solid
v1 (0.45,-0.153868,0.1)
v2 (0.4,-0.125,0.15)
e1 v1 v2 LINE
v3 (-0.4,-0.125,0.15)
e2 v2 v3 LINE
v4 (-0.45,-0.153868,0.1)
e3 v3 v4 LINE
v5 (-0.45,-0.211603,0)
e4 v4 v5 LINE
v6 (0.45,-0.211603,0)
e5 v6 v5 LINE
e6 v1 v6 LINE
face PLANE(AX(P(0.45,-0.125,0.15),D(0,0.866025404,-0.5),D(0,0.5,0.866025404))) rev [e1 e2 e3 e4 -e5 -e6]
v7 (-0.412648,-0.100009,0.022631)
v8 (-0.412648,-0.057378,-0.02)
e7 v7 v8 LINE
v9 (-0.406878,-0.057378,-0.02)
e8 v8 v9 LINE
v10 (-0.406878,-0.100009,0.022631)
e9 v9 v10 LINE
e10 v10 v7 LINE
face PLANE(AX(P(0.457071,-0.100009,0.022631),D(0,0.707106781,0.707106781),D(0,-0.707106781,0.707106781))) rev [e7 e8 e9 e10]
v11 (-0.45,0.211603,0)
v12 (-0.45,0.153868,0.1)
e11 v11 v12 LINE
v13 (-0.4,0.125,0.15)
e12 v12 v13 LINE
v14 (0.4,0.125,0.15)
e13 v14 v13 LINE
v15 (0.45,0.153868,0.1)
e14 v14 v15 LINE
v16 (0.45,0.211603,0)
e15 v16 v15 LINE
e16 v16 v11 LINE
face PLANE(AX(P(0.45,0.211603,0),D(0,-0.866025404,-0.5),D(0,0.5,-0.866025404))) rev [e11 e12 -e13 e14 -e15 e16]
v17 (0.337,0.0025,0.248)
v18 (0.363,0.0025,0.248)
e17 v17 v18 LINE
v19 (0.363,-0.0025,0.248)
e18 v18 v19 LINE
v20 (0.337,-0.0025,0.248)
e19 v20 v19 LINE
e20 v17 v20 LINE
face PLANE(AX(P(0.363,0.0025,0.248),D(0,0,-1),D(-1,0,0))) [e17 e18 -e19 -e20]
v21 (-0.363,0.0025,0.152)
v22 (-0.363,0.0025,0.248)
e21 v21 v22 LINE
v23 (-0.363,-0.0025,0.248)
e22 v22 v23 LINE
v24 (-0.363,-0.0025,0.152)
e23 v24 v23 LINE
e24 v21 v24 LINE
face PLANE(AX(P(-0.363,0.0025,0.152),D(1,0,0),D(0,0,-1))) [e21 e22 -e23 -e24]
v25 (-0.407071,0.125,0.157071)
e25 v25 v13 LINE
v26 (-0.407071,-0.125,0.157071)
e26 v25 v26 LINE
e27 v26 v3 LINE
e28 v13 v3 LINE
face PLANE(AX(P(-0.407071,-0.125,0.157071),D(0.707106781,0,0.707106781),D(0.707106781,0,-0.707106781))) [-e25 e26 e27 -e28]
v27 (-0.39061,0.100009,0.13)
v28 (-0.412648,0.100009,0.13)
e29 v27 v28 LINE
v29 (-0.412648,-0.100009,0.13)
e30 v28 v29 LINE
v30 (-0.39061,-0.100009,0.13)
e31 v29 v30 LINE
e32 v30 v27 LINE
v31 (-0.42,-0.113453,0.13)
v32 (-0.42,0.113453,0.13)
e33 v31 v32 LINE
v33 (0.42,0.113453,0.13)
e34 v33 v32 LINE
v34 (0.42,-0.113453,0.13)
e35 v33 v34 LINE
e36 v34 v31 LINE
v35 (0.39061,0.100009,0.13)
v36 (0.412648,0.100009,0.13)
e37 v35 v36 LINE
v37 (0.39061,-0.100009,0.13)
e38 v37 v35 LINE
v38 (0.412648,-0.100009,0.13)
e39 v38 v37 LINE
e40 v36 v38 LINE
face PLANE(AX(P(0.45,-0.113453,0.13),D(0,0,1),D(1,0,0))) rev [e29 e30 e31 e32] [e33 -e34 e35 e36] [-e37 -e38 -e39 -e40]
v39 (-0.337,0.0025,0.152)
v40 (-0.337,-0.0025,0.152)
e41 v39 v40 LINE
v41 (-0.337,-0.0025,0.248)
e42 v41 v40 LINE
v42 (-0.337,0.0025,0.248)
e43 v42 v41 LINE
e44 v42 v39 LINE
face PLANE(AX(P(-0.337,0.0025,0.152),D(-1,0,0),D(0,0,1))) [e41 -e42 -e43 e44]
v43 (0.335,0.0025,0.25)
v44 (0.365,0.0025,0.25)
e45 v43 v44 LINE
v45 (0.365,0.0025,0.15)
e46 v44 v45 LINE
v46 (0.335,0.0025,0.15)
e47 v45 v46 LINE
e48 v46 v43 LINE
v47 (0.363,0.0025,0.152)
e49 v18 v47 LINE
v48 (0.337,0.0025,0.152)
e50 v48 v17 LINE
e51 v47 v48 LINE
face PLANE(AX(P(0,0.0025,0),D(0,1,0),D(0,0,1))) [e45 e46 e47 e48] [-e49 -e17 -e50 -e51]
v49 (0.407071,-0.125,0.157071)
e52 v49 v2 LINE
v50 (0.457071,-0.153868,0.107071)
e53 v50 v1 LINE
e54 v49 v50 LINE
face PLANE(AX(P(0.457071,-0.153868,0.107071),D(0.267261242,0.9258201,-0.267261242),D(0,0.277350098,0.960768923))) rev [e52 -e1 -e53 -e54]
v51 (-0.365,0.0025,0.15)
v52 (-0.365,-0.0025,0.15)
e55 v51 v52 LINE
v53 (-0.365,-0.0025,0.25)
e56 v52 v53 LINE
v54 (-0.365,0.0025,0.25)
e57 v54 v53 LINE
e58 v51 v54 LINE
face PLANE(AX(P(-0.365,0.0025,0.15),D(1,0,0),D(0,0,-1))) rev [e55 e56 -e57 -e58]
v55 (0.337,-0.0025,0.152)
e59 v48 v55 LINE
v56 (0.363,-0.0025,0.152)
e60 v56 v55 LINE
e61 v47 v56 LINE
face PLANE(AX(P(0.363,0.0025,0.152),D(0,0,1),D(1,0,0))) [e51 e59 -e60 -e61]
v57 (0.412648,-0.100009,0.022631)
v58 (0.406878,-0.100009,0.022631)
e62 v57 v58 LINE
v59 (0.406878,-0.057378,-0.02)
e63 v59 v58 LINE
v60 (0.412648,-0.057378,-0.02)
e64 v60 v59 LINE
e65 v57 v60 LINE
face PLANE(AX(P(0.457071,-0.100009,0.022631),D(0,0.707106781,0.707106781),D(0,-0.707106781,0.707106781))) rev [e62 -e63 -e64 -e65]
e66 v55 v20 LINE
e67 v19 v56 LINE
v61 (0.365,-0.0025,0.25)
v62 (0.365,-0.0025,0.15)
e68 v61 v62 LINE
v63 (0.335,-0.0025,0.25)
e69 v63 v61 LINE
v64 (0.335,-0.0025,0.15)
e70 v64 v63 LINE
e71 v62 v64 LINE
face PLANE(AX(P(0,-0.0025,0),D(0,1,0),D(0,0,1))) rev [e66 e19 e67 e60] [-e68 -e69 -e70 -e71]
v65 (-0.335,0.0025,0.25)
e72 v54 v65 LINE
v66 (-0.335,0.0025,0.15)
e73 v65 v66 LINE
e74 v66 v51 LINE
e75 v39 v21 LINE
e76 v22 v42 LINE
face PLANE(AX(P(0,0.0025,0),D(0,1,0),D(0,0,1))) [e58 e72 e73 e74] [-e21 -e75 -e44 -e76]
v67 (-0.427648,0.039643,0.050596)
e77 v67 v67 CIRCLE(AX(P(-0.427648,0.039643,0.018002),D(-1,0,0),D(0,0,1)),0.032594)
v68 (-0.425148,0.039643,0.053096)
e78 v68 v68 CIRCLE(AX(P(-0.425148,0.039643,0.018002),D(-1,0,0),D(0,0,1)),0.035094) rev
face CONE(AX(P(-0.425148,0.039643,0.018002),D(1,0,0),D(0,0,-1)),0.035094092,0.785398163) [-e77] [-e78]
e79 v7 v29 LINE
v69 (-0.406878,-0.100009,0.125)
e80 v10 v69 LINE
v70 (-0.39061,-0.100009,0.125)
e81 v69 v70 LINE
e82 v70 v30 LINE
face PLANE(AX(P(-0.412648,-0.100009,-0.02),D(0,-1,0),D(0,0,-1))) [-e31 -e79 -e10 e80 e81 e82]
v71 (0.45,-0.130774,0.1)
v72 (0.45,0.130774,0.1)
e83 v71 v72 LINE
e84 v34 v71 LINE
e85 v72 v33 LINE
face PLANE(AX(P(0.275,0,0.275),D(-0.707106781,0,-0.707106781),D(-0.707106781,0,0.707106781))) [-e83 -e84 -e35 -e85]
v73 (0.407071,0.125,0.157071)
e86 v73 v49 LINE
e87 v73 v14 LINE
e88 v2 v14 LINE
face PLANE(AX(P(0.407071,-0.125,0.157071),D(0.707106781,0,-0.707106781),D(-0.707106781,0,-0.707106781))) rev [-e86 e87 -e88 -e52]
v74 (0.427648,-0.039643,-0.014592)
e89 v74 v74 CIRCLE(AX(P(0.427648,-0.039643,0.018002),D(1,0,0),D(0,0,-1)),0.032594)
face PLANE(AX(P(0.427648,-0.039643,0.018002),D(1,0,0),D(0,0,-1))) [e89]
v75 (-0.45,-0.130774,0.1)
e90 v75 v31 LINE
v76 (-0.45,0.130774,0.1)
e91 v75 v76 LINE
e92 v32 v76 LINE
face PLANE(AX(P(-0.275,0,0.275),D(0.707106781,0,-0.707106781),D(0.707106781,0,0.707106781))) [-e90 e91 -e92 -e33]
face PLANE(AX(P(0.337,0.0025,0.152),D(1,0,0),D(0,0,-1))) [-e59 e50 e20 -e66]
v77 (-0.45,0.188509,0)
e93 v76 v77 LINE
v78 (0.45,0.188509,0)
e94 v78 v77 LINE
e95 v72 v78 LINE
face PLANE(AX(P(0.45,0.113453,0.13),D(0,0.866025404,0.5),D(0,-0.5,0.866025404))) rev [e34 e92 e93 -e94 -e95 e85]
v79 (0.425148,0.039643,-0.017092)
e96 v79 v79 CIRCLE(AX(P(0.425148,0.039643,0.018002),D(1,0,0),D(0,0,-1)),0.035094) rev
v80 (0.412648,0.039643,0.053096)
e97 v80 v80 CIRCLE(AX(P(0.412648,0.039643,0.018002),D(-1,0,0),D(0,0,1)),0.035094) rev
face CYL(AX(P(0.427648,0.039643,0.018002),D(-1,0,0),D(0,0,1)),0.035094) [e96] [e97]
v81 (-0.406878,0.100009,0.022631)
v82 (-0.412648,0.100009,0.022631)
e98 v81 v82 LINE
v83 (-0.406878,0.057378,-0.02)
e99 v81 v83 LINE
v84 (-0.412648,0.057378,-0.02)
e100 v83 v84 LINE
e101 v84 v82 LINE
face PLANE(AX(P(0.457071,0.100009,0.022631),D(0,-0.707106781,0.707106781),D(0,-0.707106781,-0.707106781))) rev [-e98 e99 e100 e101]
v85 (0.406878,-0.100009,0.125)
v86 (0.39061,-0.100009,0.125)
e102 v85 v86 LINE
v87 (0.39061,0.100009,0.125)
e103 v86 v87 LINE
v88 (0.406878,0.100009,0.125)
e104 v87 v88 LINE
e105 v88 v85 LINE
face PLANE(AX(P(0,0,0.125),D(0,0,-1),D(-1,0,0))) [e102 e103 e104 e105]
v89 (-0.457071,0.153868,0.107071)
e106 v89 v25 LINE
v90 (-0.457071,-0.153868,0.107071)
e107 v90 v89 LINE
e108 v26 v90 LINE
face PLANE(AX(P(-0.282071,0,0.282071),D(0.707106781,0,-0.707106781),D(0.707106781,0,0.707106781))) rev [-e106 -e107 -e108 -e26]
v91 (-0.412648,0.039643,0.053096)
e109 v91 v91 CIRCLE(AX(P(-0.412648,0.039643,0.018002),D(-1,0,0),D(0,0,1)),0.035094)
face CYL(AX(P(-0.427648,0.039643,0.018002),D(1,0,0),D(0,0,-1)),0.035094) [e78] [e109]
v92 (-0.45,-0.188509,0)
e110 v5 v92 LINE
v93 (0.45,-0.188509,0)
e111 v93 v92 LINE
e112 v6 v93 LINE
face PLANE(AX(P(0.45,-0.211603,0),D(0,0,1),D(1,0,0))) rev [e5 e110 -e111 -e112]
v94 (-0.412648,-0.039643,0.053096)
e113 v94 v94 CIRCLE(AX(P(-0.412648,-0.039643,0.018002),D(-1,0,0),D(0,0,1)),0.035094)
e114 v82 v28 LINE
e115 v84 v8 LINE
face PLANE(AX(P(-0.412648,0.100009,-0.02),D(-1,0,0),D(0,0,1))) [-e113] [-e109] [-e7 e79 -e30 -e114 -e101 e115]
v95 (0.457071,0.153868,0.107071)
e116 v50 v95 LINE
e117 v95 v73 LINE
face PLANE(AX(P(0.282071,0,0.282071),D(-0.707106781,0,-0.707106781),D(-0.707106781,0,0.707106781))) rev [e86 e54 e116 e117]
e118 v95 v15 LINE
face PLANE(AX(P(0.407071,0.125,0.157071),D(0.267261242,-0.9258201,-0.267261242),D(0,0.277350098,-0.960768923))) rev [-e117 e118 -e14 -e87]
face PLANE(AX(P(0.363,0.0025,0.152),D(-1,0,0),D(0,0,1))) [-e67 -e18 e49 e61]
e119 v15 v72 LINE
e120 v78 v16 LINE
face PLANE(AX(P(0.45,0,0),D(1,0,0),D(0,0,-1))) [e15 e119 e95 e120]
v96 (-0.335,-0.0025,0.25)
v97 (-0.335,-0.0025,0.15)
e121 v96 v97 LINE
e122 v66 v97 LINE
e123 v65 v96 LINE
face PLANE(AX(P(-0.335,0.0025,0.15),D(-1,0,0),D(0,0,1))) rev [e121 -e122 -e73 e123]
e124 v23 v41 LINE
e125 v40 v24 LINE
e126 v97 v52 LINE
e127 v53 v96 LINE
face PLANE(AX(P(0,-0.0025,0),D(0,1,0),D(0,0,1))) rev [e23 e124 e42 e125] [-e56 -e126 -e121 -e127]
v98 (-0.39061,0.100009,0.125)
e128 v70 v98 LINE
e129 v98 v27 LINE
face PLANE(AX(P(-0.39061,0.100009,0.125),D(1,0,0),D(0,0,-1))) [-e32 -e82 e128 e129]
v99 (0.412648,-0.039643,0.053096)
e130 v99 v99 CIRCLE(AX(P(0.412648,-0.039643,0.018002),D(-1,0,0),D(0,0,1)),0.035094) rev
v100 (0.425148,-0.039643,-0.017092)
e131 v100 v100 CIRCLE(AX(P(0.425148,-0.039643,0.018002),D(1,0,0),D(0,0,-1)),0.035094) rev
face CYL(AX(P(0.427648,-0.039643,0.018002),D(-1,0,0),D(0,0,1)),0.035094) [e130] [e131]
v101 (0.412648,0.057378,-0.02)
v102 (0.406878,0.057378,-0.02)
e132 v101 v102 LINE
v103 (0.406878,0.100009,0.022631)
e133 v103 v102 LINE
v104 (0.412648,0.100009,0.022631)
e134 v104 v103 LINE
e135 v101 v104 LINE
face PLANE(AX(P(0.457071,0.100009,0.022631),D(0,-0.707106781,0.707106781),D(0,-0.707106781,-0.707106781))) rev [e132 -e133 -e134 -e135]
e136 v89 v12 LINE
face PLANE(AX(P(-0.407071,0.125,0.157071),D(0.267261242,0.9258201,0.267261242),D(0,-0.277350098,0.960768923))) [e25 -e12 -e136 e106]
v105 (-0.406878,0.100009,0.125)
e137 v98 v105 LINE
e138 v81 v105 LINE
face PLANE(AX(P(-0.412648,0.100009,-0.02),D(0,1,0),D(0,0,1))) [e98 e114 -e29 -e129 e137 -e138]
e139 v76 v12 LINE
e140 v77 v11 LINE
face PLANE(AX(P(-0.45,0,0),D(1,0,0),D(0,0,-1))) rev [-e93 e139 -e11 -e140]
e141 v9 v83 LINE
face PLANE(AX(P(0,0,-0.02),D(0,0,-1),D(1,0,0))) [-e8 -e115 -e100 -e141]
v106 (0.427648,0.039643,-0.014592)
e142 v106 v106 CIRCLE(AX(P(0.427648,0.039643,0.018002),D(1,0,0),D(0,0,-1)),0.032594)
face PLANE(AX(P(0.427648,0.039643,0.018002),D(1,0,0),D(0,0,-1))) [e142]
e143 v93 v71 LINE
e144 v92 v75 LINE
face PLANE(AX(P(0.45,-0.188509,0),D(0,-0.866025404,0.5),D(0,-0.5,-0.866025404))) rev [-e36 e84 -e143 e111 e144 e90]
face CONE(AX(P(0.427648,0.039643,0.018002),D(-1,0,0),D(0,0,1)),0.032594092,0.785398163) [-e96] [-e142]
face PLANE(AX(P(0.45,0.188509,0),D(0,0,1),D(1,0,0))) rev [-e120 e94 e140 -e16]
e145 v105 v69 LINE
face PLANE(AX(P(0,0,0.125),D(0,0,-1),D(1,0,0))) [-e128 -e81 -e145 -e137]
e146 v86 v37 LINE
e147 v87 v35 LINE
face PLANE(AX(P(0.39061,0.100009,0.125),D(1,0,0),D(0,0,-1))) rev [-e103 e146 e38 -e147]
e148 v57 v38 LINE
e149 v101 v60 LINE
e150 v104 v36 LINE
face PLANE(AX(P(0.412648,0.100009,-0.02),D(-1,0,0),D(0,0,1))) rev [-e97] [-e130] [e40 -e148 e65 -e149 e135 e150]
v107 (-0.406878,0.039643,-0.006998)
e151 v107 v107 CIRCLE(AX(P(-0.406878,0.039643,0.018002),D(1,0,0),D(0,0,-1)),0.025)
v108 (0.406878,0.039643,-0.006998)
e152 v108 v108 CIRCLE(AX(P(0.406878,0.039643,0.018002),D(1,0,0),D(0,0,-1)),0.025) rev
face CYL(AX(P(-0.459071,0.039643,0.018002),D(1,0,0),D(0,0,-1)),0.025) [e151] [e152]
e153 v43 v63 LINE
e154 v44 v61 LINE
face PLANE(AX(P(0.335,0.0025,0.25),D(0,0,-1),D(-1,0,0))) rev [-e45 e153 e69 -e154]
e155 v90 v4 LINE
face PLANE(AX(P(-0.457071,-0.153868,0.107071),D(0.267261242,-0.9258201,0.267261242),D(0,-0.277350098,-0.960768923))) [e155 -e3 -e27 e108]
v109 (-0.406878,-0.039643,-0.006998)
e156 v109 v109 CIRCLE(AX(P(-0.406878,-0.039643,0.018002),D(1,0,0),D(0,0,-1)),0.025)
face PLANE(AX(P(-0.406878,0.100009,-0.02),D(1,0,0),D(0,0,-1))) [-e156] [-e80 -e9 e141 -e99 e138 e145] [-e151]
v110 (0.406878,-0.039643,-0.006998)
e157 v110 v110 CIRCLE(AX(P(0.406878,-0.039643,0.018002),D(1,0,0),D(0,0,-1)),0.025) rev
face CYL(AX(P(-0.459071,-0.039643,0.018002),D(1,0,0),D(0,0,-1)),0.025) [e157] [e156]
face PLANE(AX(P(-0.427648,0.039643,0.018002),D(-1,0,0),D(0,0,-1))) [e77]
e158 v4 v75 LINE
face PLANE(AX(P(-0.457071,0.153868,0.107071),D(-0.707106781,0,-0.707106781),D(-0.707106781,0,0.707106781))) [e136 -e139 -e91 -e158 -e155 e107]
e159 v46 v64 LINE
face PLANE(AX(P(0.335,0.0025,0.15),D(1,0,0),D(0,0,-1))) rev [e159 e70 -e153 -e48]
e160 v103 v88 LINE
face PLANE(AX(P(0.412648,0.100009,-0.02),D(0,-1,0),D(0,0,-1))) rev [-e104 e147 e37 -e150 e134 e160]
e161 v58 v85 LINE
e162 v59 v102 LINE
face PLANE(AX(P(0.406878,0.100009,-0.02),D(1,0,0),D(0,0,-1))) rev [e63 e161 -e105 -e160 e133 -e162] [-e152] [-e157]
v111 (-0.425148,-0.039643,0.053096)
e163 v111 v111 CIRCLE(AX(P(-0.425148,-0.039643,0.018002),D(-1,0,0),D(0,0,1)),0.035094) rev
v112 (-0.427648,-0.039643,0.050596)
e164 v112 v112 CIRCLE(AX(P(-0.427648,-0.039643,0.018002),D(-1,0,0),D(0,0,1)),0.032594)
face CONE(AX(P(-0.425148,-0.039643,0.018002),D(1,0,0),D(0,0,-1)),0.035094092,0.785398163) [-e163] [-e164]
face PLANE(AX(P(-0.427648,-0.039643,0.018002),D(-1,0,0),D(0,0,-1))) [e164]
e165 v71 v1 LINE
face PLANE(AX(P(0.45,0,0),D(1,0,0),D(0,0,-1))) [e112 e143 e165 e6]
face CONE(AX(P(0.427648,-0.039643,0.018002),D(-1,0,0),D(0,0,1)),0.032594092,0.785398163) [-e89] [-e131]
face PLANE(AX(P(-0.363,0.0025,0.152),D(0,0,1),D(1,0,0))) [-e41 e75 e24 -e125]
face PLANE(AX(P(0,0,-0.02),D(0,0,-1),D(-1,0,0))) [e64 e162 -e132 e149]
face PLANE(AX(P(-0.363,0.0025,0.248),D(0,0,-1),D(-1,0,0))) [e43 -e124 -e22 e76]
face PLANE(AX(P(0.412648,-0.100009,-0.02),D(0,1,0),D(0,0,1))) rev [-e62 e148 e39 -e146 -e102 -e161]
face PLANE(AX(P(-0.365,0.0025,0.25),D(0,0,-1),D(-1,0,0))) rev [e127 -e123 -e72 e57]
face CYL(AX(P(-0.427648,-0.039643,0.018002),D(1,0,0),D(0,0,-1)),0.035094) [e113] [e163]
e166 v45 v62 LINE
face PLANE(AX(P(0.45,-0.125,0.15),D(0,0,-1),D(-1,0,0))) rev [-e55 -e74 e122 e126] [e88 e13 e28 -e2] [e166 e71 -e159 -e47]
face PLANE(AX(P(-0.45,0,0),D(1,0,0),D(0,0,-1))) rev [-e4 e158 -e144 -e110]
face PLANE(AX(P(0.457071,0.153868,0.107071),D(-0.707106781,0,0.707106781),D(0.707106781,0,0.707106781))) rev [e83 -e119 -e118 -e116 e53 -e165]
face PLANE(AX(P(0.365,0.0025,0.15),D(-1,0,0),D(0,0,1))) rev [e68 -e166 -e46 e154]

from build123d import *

# Parameters (mm, degrees)
BOSS_EXTRUDE1_DEPTH      = 0.45
CHAMFER1_SIZE            = 0.05
BOSS_EXTRUDE2_DEPTH      = 0.01
SKETCH3_W                = 0.005769739
SKETCH3_H                = 0.200017608
BOSS_EXTRUDE3_DEPTH      = 0.15
SKETCH4_W                = 0.016268309
SKETCH4_H                = 0.200017608
BOSS_EXTRUDE4_DEPTH      = 0.005
SKETCH5_W                = 0.03
SKETCH5_H                = 0.1
SKETCH5_W_2              = 0.026
SKETCH5_H_2              = 0.096
BOSS_EXTRUDE5_DEPTH      = 0.0025
BOSS_EXTRUDE6_REACH      = 2.924
SKETCH6_R                = 0.025
CUT_EXTRUDE1_DEPTH       = 1.929347517
SKETCH8_R                = 0.035094092
BOSS_EXTRUDE7_DEPTH      = 0.015
CHAMFER2_SIZE            = 0.0025
CHAMFER2_OF_MIRROR3_SIZE = 0.0025


with BuildPart() as part:
    # Sketch1 → Boss-Extrude1 (new, symmetric)
    with BuildSketch(Plane(origin=(0, 0, 0), x_dir=(0, 0, -1), z_dir=(1, 0, 0))):
        Polygon((-0.15, -0.125), (-0.15, 0.125), (0, 0.21160254), (0, 0.18850853), (-0.13, 0.113452995), (-0.13, -0.113452995), (0, -0.18850853), (0, -0.21160254), align=None)
    extrude(amount=BOSS_EXTRUDE1_DEPTH, both=True)

    # Chamfer1
    # the kernel refuses this chamfer: 0.05 mm, written as the material it takes off along each edge
    with BuildSketch(Plane(origin=(-0.45, -0.253584149, 0.15), x_dir=(0.9996219169112968, 0, 0.027495876610586285), z_dir=(0, 1, 0))) as chamfer1_piece_1:
        Polygon((CHAMFER1_SIZE * 0.999621916911, CHAMFER1_SIZE * 0.0274958766106), (-CHAMFER1_SIZE * 0.0274958766106, CHAMFER1_SIZE * 0.999621916911), (0, 0), align=None)
    extrude(amount=0.507168299, mode=Mode.SUBTRACT)
    with BuildSketch(Plane(origin=(0.45, -0.253584149, 0.15), x_dir=(-0.9996219169112968, 0, 0.027495876610586285), z_dir=(0, 1, 0))) as chamfer1_piece_2:
        Polygon((CHAMFER1_SIZE * 0.999621916911, -CHAMFER1_SIZE * 0.0274958766106), (-CHAMFER1_SIZE * 0.0274958766106, -CHAMFER1_SIZE * 0.999621916911), (0, 0), align=None)
    extrude(amount=0.507168299, mode=Mode.SUBTRACT)

    # Sketch2 → Boss-Extrude2 (add)
    with BuildSketch(Plane(origin=(0.275, 0, 0.275), x_dir=(0.7071067811865438, 0, -0.7071067811865513), z_dir=(0.7071067811865513, 0, 0.7071067811865438))):
        Polygon((0.176776695, 0.125), (0.247487373, 0.153867513), (0.247487373, -0.153867513), (0.176776695, -0.125), align=None)
    boss_extrude2 = extrude(amount=BOSS_EXTRUDE2_DEPTH)

    # Mirror1: Boss-Extrude2 across plane
    add(boss_extrude2.mirror(Plane(origin=(0, 0, 0), x_dir=(0, 0, 1), z_dir=(1, 0, 0))))

    # Sketch3 → Boss-Extrude3 (add)
    with BuildSketch(Plane(origin=(0, 0, 0.13), x_dir=(-1, 0, 0), z_dir=(0, 0, -1))):
        with Locations((-0.409763083, 0)):
            Rectangle(SKETCH3_W, SKETCH3_H)
    boss_extrude3 = extrude(amount=BOSS_EXTRUDE3_DEPTH)

    # Sketch4 → Boss-Extrude4 (add)
    with BuildSketch(Plane(origin=(0, 0, 0.13), x_dir=(-1, 0, 0), z_dir=(0, 0, -1))):
        with Locations((-0.398744059, 0)):
            Rectangle(SKETCH4_W, SKETCH4_H)
    boss_extrude4 = extrude(amount=BOSS_EXTRUDE4_DEPTH)

    # Sketch5 → Boss-Extrude5 (add, symmetric)
    # profile 1 of 2: a face of its own
    with BuildSketch(Plane(origin=(0, 0, 0), x_dir=(1, 0, 0), z_dir=(0, 1, 0))):
        with Locations((0.35, -0.2)):
            Rectangle(SKETCH5_W, SKETCH5_H)
        with Locations((0.35, -0.2)):
            Rectangle(SKETCH5_W_2, SKETCH5_H_2, mode=Mode.SUBTRACT)
    # profile 2 of 2: a face of its own
    with BuildSketch(Plane(origin=(0, 0, 0), x_dir=(1, 0, 0), z_dir=(0, 1, 0))):
        with Locations((-0.35, -0.2)):
            Rectangle(SKETCH5_W, SKETCH5_H)
        with Locations((-0.35, -0.2)):
            Rectangle(SKETCH5_W_2, SKETCH5_H_2, mode=Mode.SUBTRACT)
    extrude(amount=BOSS_EXTRUDE5_DEPTH, both=True)

    # Mirror2: Boss-Extrude3, Boss-Extrude4 across plane
    add(boss_extrude3.mirror(Plane(origin=(0, 0, 0), x_dir=(0, 0, 1), z_dir=(1, 0, 0))))
    add(boss_extrude4.mirror(Plane(origin=(0, 0, 0), x_dir=(0, 0, 1), z_dir=(1, 0, 0))))

    # Sketch6 → Boss-Extrude6 (add, up to next)
    with BuildSketch(Plane.ZY.offset(-0.406878213), mode=Mode.PRIVATE) as boss_extrude6_sk1:
        with Locations(Location((0.018001916, 0.039642936, 0), (0, 0, 180))):
            Circle(SKETCH6_R)
    boss_extrude6_tool1 = extrude(boss_extrude6_sk1.sketch, amount=BOSS_EXTRUDE6_REACH, mode=Mode.PRIVATE) - part.part
    # Sketch6 → Boss-Extrude6 (add, up to next)
    with BuildSketch(Plane.ZY.offset(-0.406878213), mode=Mode.PRIVATE) as boss_extrude6_sk2:
        with Locations(Location((0.018001916, -0.039642936, 0), (0, 0, 180))):
            Circle(SKETCH6_R)
    boss_extrude6_tool2 = extrude(boss_extrude6_sk2.sketch, amount=BOSS_EXTRUDE6_REACH, mode=Mode.PRIVATE) - part.part
    add(boss_extrude6_tool1.solids().sort_by_distance((0.406878, 0.039643, 0.018002))[0])
    add(boss_extrude6_tool2.solids().sort_by_distance((0.406878, -0.039643, 0.018002))[0])

    # Sketch7 → Cut-Extrude1 (cut, through all)
    with BuildSketch(Plane.ZY.offset(0.412647952)):
        Polygon((-0.02, 0.100008804), (0.02263059, 0.100008804), (-0.02, 0.057378214), align=None)
        Polygon((-0.02, -0.100008804), (0.02263059, -0.100008804), (-0.02, -0.057378214), align=None)
    extrude(amount=-CUT_EXTRUDE1_DEPTH, mode=Mode.SUBTRACT)

    # Sketch8 → Boss-Extrude7 (add)
    with BuildSketch(Plane(origin=(0.412647952, 0, 0), x_dir=(0, 0, -1), z_dir=(1, 0, 0))):
        with Locations(Location((-0.018001916, 0.039642936, 0), (0, 0, 180))):
            Circle(SKETCH8_R)
        with Locations(Location((-0.018001916, -0.039642936, 0), (0, 0, 180))):
            Circle(SKETCH8_R)
    boss_extrude7 = extrude(amount=BOSS_EXTRUDE7_DEPTH)

    # Chamfer2
    chamfer2_edges = [part.edges().sort_by_distance(p)[0] for p in [
        (0.427647952, 0.039642936, -0.017092176),
        (0.427647952, -0.039642936, -0.017092176),
    ]]
    chamfer(chamfer2_edges, length=CHAMFER2_SIZE)

    # Mirror3: Boss-Extrude7 across plane
    add(boss_extrude7.mirror(Plane(origin=(0, 0, 0), x_dir=(0, 0, 1), z_dir=(1, 0, 0))))

    # Chamfer2 of Mirror3
    chamfer2_of_mirror3_edges = [part.edges().sort_by_distance(p)[0] for p in [
        (-0.427647952, 0.039642936, -0.017092176),
        (-0.427647952, -0.039642936, -0.017092176),
    ]]
    chamfer(chamfer2_of_mirror3_edges, length=CHAMFER2_OF_MIRROR3_SIZE)


solid = part.part
